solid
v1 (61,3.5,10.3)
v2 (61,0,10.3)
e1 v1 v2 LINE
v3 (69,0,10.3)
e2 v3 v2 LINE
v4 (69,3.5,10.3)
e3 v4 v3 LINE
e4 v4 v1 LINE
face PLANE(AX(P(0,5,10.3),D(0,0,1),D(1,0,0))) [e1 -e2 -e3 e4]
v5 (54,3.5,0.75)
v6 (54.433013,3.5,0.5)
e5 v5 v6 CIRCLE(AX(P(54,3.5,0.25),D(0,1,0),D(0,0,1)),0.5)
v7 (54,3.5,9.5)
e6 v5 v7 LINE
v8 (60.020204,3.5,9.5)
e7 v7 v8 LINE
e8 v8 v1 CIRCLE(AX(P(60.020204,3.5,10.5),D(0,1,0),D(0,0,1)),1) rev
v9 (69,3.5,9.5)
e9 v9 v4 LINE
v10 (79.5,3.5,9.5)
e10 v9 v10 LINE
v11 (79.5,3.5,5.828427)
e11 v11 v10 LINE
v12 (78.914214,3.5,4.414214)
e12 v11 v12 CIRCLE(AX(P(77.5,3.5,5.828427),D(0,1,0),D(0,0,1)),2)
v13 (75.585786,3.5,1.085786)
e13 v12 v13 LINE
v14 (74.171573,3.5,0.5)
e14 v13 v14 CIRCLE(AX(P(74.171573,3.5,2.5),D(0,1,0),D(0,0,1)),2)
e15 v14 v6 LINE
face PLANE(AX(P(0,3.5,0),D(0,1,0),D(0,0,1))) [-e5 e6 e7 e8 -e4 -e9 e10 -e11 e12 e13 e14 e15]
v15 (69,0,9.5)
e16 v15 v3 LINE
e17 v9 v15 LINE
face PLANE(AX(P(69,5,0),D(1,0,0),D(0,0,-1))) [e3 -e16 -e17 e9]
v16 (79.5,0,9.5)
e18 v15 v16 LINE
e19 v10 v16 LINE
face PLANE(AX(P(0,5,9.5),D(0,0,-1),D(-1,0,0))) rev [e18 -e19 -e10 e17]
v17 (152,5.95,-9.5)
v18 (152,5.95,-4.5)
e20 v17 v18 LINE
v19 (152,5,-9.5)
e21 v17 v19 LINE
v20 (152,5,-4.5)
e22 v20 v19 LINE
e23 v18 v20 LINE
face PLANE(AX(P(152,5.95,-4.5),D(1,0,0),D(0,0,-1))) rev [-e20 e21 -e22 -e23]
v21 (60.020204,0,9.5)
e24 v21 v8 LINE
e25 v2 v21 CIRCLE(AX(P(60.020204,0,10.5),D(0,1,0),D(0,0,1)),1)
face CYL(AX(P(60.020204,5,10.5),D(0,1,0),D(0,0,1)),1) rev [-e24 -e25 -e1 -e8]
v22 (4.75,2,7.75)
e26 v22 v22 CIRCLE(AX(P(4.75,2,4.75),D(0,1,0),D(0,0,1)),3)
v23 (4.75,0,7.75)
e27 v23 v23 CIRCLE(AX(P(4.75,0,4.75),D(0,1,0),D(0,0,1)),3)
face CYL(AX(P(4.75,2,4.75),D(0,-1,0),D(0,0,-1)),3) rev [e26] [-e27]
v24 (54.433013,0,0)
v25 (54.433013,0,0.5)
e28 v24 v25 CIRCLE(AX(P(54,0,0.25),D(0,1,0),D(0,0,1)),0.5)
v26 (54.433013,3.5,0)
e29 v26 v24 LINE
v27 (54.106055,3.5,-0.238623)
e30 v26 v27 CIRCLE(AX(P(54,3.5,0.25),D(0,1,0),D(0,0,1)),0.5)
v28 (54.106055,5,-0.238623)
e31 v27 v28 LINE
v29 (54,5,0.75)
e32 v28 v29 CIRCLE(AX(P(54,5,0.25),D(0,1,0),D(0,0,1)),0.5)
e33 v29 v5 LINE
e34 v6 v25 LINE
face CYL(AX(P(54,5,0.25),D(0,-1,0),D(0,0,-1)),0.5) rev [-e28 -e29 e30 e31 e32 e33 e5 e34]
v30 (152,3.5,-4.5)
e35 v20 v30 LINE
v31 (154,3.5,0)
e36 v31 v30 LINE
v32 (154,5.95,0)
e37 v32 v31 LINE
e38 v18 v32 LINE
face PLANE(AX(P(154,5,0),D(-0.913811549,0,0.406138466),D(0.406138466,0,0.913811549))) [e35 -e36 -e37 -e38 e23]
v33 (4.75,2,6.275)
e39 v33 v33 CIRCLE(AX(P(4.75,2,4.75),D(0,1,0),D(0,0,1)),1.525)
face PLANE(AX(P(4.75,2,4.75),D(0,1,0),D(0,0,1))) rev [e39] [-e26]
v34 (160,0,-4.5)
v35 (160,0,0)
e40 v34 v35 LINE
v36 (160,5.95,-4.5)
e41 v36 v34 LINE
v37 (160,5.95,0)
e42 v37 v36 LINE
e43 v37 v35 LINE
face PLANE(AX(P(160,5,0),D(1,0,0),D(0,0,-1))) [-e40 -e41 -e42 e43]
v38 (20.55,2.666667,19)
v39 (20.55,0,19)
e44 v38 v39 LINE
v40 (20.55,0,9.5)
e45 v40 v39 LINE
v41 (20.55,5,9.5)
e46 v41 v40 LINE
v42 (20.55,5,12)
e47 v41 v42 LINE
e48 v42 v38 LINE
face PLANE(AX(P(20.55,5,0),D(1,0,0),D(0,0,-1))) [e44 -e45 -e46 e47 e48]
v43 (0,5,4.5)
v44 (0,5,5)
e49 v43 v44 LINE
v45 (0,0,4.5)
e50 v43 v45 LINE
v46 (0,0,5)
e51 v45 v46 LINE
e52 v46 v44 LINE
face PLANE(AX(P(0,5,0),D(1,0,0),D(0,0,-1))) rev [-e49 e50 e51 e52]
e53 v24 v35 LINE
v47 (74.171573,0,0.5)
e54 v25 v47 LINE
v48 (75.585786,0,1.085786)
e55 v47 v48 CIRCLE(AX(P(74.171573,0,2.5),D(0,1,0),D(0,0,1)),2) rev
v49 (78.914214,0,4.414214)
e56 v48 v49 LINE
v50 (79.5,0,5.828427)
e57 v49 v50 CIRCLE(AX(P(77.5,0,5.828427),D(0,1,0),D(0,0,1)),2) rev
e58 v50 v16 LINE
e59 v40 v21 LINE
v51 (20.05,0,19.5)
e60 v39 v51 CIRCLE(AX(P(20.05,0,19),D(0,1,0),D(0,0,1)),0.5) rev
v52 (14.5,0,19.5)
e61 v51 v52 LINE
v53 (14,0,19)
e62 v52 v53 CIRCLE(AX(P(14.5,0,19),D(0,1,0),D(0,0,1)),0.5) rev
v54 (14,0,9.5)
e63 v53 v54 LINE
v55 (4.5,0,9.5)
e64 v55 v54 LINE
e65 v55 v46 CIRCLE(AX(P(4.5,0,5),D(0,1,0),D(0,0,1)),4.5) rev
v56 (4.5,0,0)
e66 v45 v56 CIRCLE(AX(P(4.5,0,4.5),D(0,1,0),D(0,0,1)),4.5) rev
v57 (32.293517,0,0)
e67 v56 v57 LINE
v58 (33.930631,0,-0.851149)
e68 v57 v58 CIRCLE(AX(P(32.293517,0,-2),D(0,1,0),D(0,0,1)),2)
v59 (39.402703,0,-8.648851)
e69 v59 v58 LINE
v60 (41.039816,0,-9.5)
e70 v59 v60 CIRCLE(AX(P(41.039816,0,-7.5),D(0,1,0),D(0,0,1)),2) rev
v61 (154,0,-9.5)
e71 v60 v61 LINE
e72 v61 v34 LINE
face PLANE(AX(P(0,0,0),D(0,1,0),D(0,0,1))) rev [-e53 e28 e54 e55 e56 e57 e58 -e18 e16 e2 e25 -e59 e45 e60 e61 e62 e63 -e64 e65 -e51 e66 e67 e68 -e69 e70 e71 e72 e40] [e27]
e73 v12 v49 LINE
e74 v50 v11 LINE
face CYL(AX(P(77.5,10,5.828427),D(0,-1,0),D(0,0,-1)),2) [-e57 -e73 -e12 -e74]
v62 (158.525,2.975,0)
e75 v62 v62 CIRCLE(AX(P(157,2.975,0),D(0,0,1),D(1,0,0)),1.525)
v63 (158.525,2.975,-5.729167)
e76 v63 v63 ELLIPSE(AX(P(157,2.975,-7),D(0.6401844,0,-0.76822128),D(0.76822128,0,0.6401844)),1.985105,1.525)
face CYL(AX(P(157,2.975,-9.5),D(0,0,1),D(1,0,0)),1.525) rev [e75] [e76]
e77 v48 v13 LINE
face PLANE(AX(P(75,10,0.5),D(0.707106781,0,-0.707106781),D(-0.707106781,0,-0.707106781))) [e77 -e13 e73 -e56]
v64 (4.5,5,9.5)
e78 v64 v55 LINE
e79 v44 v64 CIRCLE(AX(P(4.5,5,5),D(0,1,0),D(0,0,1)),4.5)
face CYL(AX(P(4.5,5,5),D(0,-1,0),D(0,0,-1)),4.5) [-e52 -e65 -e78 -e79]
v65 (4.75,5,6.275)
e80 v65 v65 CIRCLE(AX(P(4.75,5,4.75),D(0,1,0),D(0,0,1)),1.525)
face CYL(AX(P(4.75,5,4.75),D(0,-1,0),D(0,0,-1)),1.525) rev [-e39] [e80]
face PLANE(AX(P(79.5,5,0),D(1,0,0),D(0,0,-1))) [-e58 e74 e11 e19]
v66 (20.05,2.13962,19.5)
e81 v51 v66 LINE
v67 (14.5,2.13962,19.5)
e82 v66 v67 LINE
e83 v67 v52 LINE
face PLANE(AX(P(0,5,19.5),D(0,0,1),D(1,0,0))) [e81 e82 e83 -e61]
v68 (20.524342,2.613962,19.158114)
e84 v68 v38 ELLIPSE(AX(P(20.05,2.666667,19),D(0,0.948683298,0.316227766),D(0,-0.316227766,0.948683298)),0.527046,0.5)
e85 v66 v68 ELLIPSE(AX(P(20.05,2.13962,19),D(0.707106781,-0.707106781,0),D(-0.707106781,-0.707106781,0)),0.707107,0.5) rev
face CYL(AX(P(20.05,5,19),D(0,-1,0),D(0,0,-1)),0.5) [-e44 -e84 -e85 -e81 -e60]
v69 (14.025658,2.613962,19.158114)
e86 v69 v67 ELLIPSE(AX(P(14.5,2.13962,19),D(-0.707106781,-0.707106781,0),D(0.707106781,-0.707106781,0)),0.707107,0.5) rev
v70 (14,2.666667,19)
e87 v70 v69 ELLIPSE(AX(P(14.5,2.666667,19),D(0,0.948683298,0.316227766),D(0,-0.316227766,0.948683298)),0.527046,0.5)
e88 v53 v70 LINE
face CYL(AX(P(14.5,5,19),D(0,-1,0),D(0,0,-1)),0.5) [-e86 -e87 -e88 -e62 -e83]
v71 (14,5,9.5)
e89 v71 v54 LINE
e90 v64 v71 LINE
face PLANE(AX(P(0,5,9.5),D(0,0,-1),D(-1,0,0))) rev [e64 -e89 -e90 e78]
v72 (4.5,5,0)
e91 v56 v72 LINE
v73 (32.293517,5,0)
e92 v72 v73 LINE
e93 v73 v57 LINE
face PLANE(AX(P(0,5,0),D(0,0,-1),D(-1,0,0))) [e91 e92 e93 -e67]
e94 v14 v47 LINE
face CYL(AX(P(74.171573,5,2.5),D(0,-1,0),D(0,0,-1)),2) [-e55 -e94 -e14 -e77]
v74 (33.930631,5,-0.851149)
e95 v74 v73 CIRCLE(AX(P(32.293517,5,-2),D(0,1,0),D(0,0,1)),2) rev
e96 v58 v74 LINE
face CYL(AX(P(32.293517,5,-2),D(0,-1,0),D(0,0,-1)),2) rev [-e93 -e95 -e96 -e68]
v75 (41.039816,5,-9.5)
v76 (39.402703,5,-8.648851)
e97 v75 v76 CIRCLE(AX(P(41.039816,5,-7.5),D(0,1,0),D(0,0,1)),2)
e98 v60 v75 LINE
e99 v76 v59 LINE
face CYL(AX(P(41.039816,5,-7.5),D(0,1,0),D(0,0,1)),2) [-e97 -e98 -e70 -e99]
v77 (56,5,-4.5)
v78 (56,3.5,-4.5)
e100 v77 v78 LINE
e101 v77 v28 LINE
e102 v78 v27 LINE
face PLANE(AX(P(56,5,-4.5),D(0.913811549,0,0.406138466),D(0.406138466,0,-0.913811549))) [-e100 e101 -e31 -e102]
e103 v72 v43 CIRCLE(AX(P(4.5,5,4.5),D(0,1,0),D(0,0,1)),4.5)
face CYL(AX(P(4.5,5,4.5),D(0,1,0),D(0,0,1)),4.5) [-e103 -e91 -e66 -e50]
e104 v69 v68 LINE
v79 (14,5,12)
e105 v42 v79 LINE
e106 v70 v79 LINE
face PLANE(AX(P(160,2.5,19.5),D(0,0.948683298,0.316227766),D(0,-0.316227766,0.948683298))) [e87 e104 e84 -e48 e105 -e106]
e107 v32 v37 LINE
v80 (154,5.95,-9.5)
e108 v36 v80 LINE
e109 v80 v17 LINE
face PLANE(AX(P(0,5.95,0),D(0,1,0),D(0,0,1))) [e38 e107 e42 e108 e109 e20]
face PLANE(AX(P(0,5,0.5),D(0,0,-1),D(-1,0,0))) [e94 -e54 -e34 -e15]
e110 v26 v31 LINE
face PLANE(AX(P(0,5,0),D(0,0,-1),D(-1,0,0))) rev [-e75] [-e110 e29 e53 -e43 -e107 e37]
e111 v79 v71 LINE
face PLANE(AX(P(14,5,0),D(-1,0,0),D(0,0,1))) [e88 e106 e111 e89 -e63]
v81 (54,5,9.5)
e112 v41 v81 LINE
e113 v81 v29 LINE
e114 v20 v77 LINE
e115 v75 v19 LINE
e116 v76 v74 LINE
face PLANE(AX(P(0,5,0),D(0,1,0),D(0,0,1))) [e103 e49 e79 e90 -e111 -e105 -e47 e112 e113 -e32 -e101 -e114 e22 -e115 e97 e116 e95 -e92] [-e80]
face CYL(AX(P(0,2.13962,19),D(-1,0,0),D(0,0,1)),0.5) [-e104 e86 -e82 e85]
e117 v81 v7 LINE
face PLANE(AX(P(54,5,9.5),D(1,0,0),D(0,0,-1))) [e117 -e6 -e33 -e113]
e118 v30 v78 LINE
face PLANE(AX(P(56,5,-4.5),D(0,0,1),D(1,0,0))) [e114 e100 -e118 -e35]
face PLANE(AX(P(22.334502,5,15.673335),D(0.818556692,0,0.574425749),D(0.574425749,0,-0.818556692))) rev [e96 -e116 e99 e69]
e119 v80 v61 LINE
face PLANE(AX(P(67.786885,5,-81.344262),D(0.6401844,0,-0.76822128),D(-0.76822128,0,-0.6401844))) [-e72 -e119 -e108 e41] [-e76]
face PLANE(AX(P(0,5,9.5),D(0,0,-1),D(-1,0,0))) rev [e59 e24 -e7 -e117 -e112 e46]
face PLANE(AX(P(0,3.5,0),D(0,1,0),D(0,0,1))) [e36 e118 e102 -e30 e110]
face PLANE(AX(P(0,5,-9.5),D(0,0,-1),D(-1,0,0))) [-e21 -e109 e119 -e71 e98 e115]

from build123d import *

# Parameters (mm, degrees)
SKETCH_1_R          = 1.525
EXTRUDE_2_DEPTH     = 5
CUT_EXTRUDE_START   = 3.5
CUT_EXTRUDE_1_DEPTH = 158.761433703
EXTRUDE_START       = -5
EXTRUDE_4_DEPTH     = 5.95
SKETCH_4_R          = 1.525
CUT_EXTRUDE_2_DEPTH = 162.293684005
SKETCH_5_R          = 3
CUT_EXTRUDE_3_DEPTH = 2
FILLET_1_R          = 4.5
CUT_EXTRUDE_4_DEPTH = 162.293684005
FILLET_4_R          = 0.5
FILLET_5_R          = 2
FILLET_11_R         = 1
CUT_EXTRUDE_5_DEPTH = 10
FILLET_12_R         = 2


with BuildPart() as part:
    # 草图1 → 凸台-拉伸2 (new body)
    with BuildSketch(Plane(origin=(0, 0, 0), x_dir=(1, 0, 0), z_dir=(0, 1, 0))):
        with BuildLine():
            Line((0, 0), (33.333333333, 0))
            Line((33.333333333, 0), (40, 9.5))
            Line((40, 9.5), (44, 9.5))
            Line((44, 9.5), (54, 9.5))
            Line((54, 9.5), (154, 9.5))
            Line((154, 9.5), (160, 4.5))
            Line((160, 4.5), (160, 0))
            Line((160, 0), (54.433012702, 0))
            ThreePointArc((54.433012702, 0), (53.5, -0.25), (54.433012702, -0.5))
            Line((54.433012702, -0.5), (67, -0.5))
            Line((67, -0.5), (70, -0.5))
            Line((70, -0.5), (79.5, -0.5))
            Line((79.5, -0.5), (79.5, -9.5))
            Line((79.5, -9.5), (70, -9.5))
            Line((70, -9.5), (69, -9.5))
            Line((69, -9.5), (69, -10.3))
            Line((69, -10.3), (61, -10.3))
            Line((61, -10.3), (61, -9.5))
            Line((61, -9.5), (20.55, -9.5))
            Line((20.55, -9.5), (20.55, -19.5))
            Line((20.55, -19.5), (14, -19.5))
            Line((14, -19.5), (14, -9.5))
            Line((14, -9.5), (0, -9.5))
            Line((0, -9.5), (0, 0))
        make_face()
        with Locations(Location((4.75, -4.75, 0), (0, 0, 270))):
            Circle(SKETCH_1_R, mode=Mode.SUBTRACT)
    extrude(amount=EXTRUDE_2_DEPTH)

    # 草图2 → 切除-拉伸1 (cut, through all)
    with BuildSketch(Plane(origin=(0, 0, 0), x_dir=(1, 0, 0), z_dir=(0, 1, 0)).offset(CUT_EXTRUDE_START)):
        Polygon((54, -9.5), (54, -0.5), (67, -0.5), (83.595743226, -0.5), (83.595743226, -15.95528926), (54, -15.95528926), align=None)
        Polygon((54, 0), (154, 0), (152, 4.5), (56, 4.5), align=None)
    extrude(amount=CUT_EXTRUDE_1_DEPTH, mode=Mode.SUBTRACT)

    # 草图3 → 凸台-拉伸4 (add)
    with BuildSketch(Plane(origin=(0, 5, 0), x_dir=(1, 0, 0), z_dir=(0, 1, 0)).offset(EXTRUDE_START)):
        Polygon((152, 4.5), (152, 9.5), (154, 9.5), (160, 4.5), (160, 0), (154, 0), align=None)
    extrude(amount=EXTRUDE_4_DEPTH)

    # 草图4 → 切除-拉伸2 (cut, through all)
    with BuildSketch(Plane.XY):
        with Locations((157, 2.975)):
            Circle(SKETCH_4_R)
    extrude(amount=-CUT_EXTRUDE_2_DEPTH, mode=Mode.SUBTRACT)

    # 草图5 → 切除-拉伸3 (cut)
    with BuildSketch(Plane(origin=(0, 0, 0), x_dir=(1, 0, 0), z_dir=(0, 1, 0))):
        with Locations(Location((4.75, -4.75, 0), (0, 0, 270))):
            Circle(SKETCH_5_R)
    extrude(amount=CUT_EXTRUDE_3_DEPTH, mode=Mode.SUBTRACT)

    # 圆角1
    fillet_1_edges = [part.edges().sort_by_distance(p)[0] for p in [
        (0, 2.5, 9.5),
        (0, 2.5, 0),
    ]]
    fillet(fillet_1_edges, radius=FILLET_1_R)

    # 草图7 → 切除-拉伸4 (cut, through all)
    with BuildSketch(Plane(origin=(0, 0, 0), x_dir=(0, 0, -1), z_dir=(1, 0, 0))):
        Polygon((-19.5, 2.5), (-12, 5), (-19.5, 5), align=None)
    extrude(amount=CUT_EXTRUDE_4_DEPTH, mode=Mode.SUBTRACT)

    # 圆角4
    fillet_4_edges = [part.edges().sort_by_distance(p)[0] for p in [
        (20.55, 1.25, 19.5),
        (14, 1.25, 19.5),
        (17.275, 2.5, 19.5),
    ]]
    fillet(fillet_4_edges, radius=FILLET_4_R)

    # 圆角5
    fillet_5_edges = [part.edges().sort_by_distance(p)[0] for p in [
        (33.333333333, 2.5, 0),
        (40, 2.5, -9.5),
    ]]
    fillet(fillet_5_edges, radius=FILLET_5_R)

    # 圆角11
    # the kernel refuses this fillet: 1 mm, written as the material it adds along each edge
    with BuildSketch(Plane(origin=(61, 0, 9.5), x_dir=(-1, 0, 0), z_dir=(0, 1, 0))) as fillet_11_piece_1:
        with BuildLine():
            CenterArc((0.979795897, 1), FILLET_11_R, 191.536959033, 78.463040967)
            Line((0, 0.8), (-0.019595918, 0.796))
            ThreePointArc((-0.019595918, 0.796), (-0.02, 0.4), (-0.02, 0))
            Line((-0.02, 0), (0, -0.02))
            Line((0, -0.02), (0.979795897, -0.02))
            Line((0.979795897, -0.02), (0.979795897, 0))
        make_face()
    extrude(amount=3.5)

    # 草图9 → 切除-拉伸5 (cut)
    with BuildSketch(Plane(origin=(0, 0, 0), x_dir=(1, 0, 0), z_dir=(0, 1, 0))):
        Polygon((75, -0.5), (79.5, -5), (79.5, -0.5), align=None)
    extrude(amount=CUT_EXTRUDE_5_DEPTH, mode=Mode.SUBTRACT)

    # 圆角12
    fillet_12_edges = [part.edges().sort_by_distance(p)[0] for p in [
        (75, 1.75, 0.5),
        (79.5, 1.75, 5),
    ]]
    fillet(fillet_12_edges, radius=FILLET_12_R)


solid = part.part
